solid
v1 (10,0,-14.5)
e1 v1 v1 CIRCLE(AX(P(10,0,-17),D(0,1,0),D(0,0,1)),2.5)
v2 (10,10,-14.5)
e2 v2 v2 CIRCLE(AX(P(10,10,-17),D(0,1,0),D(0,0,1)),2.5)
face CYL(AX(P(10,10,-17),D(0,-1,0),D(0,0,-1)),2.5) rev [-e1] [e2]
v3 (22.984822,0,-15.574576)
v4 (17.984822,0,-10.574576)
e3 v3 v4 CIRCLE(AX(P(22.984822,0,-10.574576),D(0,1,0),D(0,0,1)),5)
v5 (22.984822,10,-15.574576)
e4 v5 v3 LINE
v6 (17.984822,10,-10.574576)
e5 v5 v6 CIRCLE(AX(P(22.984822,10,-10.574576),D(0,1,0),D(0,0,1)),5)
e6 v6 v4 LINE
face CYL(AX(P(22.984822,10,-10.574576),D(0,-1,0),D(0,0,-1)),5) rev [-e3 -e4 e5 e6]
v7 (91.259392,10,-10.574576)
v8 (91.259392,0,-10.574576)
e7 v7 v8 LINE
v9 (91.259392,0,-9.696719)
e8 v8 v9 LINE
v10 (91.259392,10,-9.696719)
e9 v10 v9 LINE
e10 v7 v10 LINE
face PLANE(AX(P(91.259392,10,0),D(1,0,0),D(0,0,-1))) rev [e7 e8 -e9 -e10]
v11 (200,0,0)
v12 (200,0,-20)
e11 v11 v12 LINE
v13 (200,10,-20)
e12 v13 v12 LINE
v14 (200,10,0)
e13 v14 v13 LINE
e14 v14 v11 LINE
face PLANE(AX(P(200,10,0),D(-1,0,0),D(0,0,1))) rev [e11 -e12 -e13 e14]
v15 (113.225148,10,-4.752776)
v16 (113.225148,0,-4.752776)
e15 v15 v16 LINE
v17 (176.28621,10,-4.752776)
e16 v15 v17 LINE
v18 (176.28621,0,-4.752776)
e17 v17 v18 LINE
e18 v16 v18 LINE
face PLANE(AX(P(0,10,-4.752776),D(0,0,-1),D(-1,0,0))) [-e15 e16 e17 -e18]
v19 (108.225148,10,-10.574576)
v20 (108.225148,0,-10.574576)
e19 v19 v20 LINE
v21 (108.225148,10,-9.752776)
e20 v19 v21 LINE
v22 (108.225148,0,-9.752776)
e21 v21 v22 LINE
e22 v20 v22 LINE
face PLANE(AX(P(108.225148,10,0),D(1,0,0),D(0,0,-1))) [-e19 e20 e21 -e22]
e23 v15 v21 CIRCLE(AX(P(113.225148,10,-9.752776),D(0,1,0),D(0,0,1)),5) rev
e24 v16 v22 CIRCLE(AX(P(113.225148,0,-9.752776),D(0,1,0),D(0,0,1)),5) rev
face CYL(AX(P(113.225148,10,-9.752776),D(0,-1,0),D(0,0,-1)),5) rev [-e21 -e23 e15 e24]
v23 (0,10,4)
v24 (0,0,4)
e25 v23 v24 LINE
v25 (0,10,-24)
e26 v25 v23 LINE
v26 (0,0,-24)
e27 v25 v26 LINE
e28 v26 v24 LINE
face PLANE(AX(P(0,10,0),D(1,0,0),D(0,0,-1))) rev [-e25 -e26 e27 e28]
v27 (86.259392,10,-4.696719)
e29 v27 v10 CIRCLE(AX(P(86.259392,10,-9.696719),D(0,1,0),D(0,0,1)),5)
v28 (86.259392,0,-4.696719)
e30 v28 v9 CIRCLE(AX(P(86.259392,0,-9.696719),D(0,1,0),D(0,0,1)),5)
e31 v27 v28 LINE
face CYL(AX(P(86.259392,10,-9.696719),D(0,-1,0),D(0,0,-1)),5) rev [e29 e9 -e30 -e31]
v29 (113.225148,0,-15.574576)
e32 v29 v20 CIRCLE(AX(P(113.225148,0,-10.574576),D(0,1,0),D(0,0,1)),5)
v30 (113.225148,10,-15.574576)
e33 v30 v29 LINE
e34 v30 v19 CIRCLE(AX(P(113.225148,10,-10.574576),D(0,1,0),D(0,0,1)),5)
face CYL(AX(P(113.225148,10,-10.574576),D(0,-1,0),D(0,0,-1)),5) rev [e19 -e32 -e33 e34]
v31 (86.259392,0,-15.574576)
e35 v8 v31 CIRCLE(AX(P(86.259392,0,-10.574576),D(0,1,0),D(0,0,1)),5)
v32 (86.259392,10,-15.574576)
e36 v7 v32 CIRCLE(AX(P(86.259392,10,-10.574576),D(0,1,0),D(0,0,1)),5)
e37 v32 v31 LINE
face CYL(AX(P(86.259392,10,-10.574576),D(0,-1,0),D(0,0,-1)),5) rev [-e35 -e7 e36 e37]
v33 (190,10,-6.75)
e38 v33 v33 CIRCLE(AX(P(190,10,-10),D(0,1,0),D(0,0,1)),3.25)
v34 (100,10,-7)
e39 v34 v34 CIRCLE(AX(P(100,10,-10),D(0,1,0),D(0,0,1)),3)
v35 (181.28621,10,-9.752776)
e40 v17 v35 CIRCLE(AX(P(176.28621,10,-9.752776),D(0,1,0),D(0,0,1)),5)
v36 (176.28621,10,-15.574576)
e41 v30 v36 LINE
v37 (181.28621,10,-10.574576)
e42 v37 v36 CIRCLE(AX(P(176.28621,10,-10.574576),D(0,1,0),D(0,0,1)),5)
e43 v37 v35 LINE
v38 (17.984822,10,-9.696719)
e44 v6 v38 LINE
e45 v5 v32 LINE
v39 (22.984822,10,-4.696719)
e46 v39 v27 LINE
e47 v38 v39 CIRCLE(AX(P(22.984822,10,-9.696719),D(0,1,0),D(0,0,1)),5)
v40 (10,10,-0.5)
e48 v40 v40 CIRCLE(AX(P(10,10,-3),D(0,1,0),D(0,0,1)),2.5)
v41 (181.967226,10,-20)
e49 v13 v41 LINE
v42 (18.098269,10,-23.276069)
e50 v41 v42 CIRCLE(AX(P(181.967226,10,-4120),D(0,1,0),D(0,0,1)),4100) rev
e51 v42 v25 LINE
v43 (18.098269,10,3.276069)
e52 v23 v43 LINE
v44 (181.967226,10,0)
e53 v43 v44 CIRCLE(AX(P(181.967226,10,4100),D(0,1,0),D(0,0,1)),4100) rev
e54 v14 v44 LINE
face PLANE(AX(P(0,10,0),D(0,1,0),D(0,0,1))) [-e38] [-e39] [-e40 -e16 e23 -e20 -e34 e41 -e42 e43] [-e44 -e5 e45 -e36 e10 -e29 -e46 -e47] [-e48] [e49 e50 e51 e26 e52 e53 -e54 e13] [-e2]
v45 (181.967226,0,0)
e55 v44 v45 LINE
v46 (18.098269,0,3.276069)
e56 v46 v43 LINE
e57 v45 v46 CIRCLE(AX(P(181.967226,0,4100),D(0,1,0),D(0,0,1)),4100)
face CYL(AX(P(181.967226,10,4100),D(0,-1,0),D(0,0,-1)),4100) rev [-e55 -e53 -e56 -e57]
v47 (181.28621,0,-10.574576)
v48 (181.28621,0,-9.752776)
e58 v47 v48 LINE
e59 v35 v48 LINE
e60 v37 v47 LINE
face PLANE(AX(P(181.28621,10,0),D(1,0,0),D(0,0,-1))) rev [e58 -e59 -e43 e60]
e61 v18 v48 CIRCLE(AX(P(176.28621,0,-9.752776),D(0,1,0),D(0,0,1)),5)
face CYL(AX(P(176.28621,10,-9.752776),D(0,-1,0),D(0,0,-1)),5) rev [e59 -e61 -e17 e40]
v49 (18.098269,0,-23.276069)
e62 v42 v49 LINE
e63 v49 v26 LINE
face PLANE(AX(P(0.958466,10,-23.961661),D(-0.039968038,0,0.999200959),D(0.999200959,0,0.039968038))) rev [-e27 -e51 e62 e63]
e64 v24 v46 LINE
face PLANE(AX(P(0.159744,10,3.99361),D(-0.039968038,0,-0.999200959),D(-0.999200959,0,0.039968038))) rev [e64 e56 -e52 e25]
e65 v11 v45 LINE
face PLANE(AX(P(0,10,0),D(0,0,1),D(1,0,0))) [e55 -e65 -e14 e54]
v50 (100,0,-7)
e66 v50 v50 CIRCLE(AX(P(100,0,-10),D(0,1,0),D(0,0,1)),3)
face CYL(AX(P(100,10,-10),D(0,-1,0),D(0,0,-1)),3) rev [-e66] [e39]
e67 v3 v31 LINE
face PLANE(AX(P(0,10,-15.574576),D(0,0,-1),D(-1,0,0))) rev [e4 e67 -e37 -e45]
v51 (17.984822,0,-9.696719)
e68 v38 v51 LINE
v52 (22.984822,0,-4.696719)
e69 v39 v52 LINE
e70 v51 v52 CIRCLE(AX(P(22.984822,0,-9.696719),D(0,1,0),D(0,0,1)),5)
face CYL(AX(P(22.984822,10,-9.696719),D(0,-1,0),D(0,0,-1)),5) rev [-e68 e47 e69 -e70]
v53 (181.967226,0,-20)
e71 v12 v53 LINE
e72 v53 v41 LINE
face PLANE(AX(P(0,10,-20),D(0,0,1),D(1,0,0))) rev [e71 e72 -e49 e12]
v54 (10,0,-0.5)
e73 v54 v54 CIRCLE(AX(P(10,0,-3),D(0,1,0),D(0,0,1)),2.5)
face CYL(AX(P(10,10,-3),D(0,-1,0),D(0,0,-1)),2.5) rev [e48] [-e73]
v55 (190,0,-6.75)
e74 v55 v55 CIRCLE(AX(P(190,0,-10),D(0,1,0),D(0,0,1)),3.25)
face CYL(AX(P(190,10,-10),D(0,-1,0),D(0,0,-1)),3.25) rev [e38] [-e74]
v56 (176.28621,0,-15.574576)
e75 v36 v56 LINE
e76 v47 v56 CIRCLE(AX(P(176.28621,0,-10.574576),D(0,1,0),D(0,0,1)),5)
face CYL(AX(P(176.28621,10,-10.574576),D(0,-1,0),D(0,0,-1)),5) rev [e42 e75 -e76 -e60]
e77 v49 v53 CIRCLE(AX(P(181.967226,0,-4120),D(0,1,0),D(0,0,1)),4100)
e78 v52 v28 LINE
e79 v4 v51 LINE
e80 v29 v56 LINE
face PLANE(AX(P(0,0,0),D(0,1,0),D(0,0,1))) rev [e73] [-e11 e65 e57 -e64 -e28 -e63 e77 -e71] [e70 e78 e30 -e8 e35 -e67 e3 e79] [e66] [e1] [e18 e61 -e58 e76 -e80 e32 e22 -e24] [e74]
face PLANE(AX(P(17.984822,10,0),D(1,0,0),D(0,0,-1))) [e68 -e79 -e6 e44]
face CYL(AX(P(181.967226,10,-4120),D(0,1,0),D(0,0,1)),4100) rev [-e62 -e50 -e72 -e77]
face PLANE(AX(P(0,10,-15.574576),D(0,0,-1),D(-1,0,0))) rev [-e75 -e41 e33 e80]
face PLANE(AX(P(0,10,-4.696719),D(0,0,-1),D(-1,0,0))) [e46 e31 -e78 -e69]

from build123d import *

# Parameters (mm, degrees)
SZKIC1_R                    = 3
SZKIC1_R_2                  = 3.25
SZKIC1_R_3                  = 2.5
DODANIE_WYCI_GNI_CIE1_DEPTH = 10
ZAOKR_GLENIE1_R             = 4100


with BuildPart() as part:
    # Szkic1 → Dodanie-wyciągnięcie1 (new body)
    with BuildSketch(Plane(origin=(0, 0, 0), x_dir=(1, 0, 0), z_dir=(0, 1, 0))):
        Polygon((200, 0), (200, 20), (100, 20), (0, 24), (0, -4), (100, 0), align=None)
        with Locations(Location((100, 10, 0), (0, 0, 270))):
            Circle(SZKIC1_R, mode=Mode.SUBTRACT)
        with Locations(Location((190, 10, 0), (0, 0, 270))):
            Circle(SZKIC1_R_2, mode=Mode.SUBTRACT)
        with Locations(Location((10, 17, 0), (0, 0, 270))):
            Circle(SZKIC1_R_3, mode=Mode.SUBTRACT)
        with Locations(Location((10, 3, 0), (0, 0, 270))):
            Circle(SZKIC1_R_3, mode=Mode.SUBTRACT)
        with BuildLine():
            Line((22.984822323, 15.57457628), (86.25939238, 15.57457628))
            ThreePointArc((86.25939238, 15.57457628), (89.794926286, 14.110110186), (91.25939238, 10.57457628))
            Line((91.25939238, 10.57457628), (91.25939238, 9.696719379))
            ThreePointArc((91.25939238, 9.696719379), (89.794926286, 6.161185473), (86.25939238, 4.696719379))
            Line((86.25939238, 4.696719379), (22.984822323, 4.696719379))
            ThreePointArc((22.984822323, 4.696719379), (19.449288417, 6.161185473), (17.984822323, 9.696719379))
            Line((17.984822323, 9.696719379), (17.984822323, 10.57457628))
            ThreePointArc((17.984822323, 10.57457628), (19.449288417, 14.110110186), (22.984822323, 15.57457628))
        make_face(mode=Mode.SUBTRACT)
        with BuildLine():
            Line((113.225148066, 15.57457628), (176.286209663, 15.57457628))
            ThreePointArc((176.286209663, 15.57457628), (179.821743569, 14.110110186), (181.286209663, 10.57457628))
            Line((181.286209663, 10.57457628), (181.286209663, 9.752776346))
            ThreePointArc((181.286209663, 9.752776346), (179.821743569, 6.21724244), (176.286209663, 4.752776346))
            Line((176.286209663, 4.752776346), (113.225148066, 4.752776346))
            ThreePointArc((113.225148066, 4.752776346), (109.68961416, 6.21724244), (108.225148066, 9.752776346))
            Line((108.225148066, 9.752776346), (108.225148066, 10.57457628))
            ThreePointArc((108.225148066, 10.57457628), (109.68961416, 14.110110186), (113.225148066, 15.57457628))
        make_face(mode=Mode.SUBTRACT)
    extrude(amount=DODANIE_WYCI_GNI_CIE1_DEPTH)

    # Zaokrąglenie1
    # the kernel refuses this fillet: 4100 mm, written as the material it adds along each edge
    with BuildSketch(Plane(origin=(100, 0, -20), x_dir=(1, 0, 0), z_dir=(0, 1, 0)), Plane(origin=(100, 0, 0), x_dir=(-0.9992009587217893, 0, 0.03996803834887583), z_dir=(0, 1, 0))) as zaokr_glenie1_piece_1:
        with BuildLine():
            CenterArc((ZAOKR_GLENIE1_R * 0.0199920063936, ZAOKR_GLENIE1_R), ZAOKR_GLENIE1_R, 267.709389957, 2.290610043)
            Line((-ZAOKR_GLENIE1_R * 0.0199760319553, ZAOKR_GLENIE1_R * 0.000799041278211), (0, 0))
            Line((0, 0), (ZAOKR_GLENIE1_R * 0.0199920063936, 0))
        make_face()
    extrude(amount=10)


solid = part.part
